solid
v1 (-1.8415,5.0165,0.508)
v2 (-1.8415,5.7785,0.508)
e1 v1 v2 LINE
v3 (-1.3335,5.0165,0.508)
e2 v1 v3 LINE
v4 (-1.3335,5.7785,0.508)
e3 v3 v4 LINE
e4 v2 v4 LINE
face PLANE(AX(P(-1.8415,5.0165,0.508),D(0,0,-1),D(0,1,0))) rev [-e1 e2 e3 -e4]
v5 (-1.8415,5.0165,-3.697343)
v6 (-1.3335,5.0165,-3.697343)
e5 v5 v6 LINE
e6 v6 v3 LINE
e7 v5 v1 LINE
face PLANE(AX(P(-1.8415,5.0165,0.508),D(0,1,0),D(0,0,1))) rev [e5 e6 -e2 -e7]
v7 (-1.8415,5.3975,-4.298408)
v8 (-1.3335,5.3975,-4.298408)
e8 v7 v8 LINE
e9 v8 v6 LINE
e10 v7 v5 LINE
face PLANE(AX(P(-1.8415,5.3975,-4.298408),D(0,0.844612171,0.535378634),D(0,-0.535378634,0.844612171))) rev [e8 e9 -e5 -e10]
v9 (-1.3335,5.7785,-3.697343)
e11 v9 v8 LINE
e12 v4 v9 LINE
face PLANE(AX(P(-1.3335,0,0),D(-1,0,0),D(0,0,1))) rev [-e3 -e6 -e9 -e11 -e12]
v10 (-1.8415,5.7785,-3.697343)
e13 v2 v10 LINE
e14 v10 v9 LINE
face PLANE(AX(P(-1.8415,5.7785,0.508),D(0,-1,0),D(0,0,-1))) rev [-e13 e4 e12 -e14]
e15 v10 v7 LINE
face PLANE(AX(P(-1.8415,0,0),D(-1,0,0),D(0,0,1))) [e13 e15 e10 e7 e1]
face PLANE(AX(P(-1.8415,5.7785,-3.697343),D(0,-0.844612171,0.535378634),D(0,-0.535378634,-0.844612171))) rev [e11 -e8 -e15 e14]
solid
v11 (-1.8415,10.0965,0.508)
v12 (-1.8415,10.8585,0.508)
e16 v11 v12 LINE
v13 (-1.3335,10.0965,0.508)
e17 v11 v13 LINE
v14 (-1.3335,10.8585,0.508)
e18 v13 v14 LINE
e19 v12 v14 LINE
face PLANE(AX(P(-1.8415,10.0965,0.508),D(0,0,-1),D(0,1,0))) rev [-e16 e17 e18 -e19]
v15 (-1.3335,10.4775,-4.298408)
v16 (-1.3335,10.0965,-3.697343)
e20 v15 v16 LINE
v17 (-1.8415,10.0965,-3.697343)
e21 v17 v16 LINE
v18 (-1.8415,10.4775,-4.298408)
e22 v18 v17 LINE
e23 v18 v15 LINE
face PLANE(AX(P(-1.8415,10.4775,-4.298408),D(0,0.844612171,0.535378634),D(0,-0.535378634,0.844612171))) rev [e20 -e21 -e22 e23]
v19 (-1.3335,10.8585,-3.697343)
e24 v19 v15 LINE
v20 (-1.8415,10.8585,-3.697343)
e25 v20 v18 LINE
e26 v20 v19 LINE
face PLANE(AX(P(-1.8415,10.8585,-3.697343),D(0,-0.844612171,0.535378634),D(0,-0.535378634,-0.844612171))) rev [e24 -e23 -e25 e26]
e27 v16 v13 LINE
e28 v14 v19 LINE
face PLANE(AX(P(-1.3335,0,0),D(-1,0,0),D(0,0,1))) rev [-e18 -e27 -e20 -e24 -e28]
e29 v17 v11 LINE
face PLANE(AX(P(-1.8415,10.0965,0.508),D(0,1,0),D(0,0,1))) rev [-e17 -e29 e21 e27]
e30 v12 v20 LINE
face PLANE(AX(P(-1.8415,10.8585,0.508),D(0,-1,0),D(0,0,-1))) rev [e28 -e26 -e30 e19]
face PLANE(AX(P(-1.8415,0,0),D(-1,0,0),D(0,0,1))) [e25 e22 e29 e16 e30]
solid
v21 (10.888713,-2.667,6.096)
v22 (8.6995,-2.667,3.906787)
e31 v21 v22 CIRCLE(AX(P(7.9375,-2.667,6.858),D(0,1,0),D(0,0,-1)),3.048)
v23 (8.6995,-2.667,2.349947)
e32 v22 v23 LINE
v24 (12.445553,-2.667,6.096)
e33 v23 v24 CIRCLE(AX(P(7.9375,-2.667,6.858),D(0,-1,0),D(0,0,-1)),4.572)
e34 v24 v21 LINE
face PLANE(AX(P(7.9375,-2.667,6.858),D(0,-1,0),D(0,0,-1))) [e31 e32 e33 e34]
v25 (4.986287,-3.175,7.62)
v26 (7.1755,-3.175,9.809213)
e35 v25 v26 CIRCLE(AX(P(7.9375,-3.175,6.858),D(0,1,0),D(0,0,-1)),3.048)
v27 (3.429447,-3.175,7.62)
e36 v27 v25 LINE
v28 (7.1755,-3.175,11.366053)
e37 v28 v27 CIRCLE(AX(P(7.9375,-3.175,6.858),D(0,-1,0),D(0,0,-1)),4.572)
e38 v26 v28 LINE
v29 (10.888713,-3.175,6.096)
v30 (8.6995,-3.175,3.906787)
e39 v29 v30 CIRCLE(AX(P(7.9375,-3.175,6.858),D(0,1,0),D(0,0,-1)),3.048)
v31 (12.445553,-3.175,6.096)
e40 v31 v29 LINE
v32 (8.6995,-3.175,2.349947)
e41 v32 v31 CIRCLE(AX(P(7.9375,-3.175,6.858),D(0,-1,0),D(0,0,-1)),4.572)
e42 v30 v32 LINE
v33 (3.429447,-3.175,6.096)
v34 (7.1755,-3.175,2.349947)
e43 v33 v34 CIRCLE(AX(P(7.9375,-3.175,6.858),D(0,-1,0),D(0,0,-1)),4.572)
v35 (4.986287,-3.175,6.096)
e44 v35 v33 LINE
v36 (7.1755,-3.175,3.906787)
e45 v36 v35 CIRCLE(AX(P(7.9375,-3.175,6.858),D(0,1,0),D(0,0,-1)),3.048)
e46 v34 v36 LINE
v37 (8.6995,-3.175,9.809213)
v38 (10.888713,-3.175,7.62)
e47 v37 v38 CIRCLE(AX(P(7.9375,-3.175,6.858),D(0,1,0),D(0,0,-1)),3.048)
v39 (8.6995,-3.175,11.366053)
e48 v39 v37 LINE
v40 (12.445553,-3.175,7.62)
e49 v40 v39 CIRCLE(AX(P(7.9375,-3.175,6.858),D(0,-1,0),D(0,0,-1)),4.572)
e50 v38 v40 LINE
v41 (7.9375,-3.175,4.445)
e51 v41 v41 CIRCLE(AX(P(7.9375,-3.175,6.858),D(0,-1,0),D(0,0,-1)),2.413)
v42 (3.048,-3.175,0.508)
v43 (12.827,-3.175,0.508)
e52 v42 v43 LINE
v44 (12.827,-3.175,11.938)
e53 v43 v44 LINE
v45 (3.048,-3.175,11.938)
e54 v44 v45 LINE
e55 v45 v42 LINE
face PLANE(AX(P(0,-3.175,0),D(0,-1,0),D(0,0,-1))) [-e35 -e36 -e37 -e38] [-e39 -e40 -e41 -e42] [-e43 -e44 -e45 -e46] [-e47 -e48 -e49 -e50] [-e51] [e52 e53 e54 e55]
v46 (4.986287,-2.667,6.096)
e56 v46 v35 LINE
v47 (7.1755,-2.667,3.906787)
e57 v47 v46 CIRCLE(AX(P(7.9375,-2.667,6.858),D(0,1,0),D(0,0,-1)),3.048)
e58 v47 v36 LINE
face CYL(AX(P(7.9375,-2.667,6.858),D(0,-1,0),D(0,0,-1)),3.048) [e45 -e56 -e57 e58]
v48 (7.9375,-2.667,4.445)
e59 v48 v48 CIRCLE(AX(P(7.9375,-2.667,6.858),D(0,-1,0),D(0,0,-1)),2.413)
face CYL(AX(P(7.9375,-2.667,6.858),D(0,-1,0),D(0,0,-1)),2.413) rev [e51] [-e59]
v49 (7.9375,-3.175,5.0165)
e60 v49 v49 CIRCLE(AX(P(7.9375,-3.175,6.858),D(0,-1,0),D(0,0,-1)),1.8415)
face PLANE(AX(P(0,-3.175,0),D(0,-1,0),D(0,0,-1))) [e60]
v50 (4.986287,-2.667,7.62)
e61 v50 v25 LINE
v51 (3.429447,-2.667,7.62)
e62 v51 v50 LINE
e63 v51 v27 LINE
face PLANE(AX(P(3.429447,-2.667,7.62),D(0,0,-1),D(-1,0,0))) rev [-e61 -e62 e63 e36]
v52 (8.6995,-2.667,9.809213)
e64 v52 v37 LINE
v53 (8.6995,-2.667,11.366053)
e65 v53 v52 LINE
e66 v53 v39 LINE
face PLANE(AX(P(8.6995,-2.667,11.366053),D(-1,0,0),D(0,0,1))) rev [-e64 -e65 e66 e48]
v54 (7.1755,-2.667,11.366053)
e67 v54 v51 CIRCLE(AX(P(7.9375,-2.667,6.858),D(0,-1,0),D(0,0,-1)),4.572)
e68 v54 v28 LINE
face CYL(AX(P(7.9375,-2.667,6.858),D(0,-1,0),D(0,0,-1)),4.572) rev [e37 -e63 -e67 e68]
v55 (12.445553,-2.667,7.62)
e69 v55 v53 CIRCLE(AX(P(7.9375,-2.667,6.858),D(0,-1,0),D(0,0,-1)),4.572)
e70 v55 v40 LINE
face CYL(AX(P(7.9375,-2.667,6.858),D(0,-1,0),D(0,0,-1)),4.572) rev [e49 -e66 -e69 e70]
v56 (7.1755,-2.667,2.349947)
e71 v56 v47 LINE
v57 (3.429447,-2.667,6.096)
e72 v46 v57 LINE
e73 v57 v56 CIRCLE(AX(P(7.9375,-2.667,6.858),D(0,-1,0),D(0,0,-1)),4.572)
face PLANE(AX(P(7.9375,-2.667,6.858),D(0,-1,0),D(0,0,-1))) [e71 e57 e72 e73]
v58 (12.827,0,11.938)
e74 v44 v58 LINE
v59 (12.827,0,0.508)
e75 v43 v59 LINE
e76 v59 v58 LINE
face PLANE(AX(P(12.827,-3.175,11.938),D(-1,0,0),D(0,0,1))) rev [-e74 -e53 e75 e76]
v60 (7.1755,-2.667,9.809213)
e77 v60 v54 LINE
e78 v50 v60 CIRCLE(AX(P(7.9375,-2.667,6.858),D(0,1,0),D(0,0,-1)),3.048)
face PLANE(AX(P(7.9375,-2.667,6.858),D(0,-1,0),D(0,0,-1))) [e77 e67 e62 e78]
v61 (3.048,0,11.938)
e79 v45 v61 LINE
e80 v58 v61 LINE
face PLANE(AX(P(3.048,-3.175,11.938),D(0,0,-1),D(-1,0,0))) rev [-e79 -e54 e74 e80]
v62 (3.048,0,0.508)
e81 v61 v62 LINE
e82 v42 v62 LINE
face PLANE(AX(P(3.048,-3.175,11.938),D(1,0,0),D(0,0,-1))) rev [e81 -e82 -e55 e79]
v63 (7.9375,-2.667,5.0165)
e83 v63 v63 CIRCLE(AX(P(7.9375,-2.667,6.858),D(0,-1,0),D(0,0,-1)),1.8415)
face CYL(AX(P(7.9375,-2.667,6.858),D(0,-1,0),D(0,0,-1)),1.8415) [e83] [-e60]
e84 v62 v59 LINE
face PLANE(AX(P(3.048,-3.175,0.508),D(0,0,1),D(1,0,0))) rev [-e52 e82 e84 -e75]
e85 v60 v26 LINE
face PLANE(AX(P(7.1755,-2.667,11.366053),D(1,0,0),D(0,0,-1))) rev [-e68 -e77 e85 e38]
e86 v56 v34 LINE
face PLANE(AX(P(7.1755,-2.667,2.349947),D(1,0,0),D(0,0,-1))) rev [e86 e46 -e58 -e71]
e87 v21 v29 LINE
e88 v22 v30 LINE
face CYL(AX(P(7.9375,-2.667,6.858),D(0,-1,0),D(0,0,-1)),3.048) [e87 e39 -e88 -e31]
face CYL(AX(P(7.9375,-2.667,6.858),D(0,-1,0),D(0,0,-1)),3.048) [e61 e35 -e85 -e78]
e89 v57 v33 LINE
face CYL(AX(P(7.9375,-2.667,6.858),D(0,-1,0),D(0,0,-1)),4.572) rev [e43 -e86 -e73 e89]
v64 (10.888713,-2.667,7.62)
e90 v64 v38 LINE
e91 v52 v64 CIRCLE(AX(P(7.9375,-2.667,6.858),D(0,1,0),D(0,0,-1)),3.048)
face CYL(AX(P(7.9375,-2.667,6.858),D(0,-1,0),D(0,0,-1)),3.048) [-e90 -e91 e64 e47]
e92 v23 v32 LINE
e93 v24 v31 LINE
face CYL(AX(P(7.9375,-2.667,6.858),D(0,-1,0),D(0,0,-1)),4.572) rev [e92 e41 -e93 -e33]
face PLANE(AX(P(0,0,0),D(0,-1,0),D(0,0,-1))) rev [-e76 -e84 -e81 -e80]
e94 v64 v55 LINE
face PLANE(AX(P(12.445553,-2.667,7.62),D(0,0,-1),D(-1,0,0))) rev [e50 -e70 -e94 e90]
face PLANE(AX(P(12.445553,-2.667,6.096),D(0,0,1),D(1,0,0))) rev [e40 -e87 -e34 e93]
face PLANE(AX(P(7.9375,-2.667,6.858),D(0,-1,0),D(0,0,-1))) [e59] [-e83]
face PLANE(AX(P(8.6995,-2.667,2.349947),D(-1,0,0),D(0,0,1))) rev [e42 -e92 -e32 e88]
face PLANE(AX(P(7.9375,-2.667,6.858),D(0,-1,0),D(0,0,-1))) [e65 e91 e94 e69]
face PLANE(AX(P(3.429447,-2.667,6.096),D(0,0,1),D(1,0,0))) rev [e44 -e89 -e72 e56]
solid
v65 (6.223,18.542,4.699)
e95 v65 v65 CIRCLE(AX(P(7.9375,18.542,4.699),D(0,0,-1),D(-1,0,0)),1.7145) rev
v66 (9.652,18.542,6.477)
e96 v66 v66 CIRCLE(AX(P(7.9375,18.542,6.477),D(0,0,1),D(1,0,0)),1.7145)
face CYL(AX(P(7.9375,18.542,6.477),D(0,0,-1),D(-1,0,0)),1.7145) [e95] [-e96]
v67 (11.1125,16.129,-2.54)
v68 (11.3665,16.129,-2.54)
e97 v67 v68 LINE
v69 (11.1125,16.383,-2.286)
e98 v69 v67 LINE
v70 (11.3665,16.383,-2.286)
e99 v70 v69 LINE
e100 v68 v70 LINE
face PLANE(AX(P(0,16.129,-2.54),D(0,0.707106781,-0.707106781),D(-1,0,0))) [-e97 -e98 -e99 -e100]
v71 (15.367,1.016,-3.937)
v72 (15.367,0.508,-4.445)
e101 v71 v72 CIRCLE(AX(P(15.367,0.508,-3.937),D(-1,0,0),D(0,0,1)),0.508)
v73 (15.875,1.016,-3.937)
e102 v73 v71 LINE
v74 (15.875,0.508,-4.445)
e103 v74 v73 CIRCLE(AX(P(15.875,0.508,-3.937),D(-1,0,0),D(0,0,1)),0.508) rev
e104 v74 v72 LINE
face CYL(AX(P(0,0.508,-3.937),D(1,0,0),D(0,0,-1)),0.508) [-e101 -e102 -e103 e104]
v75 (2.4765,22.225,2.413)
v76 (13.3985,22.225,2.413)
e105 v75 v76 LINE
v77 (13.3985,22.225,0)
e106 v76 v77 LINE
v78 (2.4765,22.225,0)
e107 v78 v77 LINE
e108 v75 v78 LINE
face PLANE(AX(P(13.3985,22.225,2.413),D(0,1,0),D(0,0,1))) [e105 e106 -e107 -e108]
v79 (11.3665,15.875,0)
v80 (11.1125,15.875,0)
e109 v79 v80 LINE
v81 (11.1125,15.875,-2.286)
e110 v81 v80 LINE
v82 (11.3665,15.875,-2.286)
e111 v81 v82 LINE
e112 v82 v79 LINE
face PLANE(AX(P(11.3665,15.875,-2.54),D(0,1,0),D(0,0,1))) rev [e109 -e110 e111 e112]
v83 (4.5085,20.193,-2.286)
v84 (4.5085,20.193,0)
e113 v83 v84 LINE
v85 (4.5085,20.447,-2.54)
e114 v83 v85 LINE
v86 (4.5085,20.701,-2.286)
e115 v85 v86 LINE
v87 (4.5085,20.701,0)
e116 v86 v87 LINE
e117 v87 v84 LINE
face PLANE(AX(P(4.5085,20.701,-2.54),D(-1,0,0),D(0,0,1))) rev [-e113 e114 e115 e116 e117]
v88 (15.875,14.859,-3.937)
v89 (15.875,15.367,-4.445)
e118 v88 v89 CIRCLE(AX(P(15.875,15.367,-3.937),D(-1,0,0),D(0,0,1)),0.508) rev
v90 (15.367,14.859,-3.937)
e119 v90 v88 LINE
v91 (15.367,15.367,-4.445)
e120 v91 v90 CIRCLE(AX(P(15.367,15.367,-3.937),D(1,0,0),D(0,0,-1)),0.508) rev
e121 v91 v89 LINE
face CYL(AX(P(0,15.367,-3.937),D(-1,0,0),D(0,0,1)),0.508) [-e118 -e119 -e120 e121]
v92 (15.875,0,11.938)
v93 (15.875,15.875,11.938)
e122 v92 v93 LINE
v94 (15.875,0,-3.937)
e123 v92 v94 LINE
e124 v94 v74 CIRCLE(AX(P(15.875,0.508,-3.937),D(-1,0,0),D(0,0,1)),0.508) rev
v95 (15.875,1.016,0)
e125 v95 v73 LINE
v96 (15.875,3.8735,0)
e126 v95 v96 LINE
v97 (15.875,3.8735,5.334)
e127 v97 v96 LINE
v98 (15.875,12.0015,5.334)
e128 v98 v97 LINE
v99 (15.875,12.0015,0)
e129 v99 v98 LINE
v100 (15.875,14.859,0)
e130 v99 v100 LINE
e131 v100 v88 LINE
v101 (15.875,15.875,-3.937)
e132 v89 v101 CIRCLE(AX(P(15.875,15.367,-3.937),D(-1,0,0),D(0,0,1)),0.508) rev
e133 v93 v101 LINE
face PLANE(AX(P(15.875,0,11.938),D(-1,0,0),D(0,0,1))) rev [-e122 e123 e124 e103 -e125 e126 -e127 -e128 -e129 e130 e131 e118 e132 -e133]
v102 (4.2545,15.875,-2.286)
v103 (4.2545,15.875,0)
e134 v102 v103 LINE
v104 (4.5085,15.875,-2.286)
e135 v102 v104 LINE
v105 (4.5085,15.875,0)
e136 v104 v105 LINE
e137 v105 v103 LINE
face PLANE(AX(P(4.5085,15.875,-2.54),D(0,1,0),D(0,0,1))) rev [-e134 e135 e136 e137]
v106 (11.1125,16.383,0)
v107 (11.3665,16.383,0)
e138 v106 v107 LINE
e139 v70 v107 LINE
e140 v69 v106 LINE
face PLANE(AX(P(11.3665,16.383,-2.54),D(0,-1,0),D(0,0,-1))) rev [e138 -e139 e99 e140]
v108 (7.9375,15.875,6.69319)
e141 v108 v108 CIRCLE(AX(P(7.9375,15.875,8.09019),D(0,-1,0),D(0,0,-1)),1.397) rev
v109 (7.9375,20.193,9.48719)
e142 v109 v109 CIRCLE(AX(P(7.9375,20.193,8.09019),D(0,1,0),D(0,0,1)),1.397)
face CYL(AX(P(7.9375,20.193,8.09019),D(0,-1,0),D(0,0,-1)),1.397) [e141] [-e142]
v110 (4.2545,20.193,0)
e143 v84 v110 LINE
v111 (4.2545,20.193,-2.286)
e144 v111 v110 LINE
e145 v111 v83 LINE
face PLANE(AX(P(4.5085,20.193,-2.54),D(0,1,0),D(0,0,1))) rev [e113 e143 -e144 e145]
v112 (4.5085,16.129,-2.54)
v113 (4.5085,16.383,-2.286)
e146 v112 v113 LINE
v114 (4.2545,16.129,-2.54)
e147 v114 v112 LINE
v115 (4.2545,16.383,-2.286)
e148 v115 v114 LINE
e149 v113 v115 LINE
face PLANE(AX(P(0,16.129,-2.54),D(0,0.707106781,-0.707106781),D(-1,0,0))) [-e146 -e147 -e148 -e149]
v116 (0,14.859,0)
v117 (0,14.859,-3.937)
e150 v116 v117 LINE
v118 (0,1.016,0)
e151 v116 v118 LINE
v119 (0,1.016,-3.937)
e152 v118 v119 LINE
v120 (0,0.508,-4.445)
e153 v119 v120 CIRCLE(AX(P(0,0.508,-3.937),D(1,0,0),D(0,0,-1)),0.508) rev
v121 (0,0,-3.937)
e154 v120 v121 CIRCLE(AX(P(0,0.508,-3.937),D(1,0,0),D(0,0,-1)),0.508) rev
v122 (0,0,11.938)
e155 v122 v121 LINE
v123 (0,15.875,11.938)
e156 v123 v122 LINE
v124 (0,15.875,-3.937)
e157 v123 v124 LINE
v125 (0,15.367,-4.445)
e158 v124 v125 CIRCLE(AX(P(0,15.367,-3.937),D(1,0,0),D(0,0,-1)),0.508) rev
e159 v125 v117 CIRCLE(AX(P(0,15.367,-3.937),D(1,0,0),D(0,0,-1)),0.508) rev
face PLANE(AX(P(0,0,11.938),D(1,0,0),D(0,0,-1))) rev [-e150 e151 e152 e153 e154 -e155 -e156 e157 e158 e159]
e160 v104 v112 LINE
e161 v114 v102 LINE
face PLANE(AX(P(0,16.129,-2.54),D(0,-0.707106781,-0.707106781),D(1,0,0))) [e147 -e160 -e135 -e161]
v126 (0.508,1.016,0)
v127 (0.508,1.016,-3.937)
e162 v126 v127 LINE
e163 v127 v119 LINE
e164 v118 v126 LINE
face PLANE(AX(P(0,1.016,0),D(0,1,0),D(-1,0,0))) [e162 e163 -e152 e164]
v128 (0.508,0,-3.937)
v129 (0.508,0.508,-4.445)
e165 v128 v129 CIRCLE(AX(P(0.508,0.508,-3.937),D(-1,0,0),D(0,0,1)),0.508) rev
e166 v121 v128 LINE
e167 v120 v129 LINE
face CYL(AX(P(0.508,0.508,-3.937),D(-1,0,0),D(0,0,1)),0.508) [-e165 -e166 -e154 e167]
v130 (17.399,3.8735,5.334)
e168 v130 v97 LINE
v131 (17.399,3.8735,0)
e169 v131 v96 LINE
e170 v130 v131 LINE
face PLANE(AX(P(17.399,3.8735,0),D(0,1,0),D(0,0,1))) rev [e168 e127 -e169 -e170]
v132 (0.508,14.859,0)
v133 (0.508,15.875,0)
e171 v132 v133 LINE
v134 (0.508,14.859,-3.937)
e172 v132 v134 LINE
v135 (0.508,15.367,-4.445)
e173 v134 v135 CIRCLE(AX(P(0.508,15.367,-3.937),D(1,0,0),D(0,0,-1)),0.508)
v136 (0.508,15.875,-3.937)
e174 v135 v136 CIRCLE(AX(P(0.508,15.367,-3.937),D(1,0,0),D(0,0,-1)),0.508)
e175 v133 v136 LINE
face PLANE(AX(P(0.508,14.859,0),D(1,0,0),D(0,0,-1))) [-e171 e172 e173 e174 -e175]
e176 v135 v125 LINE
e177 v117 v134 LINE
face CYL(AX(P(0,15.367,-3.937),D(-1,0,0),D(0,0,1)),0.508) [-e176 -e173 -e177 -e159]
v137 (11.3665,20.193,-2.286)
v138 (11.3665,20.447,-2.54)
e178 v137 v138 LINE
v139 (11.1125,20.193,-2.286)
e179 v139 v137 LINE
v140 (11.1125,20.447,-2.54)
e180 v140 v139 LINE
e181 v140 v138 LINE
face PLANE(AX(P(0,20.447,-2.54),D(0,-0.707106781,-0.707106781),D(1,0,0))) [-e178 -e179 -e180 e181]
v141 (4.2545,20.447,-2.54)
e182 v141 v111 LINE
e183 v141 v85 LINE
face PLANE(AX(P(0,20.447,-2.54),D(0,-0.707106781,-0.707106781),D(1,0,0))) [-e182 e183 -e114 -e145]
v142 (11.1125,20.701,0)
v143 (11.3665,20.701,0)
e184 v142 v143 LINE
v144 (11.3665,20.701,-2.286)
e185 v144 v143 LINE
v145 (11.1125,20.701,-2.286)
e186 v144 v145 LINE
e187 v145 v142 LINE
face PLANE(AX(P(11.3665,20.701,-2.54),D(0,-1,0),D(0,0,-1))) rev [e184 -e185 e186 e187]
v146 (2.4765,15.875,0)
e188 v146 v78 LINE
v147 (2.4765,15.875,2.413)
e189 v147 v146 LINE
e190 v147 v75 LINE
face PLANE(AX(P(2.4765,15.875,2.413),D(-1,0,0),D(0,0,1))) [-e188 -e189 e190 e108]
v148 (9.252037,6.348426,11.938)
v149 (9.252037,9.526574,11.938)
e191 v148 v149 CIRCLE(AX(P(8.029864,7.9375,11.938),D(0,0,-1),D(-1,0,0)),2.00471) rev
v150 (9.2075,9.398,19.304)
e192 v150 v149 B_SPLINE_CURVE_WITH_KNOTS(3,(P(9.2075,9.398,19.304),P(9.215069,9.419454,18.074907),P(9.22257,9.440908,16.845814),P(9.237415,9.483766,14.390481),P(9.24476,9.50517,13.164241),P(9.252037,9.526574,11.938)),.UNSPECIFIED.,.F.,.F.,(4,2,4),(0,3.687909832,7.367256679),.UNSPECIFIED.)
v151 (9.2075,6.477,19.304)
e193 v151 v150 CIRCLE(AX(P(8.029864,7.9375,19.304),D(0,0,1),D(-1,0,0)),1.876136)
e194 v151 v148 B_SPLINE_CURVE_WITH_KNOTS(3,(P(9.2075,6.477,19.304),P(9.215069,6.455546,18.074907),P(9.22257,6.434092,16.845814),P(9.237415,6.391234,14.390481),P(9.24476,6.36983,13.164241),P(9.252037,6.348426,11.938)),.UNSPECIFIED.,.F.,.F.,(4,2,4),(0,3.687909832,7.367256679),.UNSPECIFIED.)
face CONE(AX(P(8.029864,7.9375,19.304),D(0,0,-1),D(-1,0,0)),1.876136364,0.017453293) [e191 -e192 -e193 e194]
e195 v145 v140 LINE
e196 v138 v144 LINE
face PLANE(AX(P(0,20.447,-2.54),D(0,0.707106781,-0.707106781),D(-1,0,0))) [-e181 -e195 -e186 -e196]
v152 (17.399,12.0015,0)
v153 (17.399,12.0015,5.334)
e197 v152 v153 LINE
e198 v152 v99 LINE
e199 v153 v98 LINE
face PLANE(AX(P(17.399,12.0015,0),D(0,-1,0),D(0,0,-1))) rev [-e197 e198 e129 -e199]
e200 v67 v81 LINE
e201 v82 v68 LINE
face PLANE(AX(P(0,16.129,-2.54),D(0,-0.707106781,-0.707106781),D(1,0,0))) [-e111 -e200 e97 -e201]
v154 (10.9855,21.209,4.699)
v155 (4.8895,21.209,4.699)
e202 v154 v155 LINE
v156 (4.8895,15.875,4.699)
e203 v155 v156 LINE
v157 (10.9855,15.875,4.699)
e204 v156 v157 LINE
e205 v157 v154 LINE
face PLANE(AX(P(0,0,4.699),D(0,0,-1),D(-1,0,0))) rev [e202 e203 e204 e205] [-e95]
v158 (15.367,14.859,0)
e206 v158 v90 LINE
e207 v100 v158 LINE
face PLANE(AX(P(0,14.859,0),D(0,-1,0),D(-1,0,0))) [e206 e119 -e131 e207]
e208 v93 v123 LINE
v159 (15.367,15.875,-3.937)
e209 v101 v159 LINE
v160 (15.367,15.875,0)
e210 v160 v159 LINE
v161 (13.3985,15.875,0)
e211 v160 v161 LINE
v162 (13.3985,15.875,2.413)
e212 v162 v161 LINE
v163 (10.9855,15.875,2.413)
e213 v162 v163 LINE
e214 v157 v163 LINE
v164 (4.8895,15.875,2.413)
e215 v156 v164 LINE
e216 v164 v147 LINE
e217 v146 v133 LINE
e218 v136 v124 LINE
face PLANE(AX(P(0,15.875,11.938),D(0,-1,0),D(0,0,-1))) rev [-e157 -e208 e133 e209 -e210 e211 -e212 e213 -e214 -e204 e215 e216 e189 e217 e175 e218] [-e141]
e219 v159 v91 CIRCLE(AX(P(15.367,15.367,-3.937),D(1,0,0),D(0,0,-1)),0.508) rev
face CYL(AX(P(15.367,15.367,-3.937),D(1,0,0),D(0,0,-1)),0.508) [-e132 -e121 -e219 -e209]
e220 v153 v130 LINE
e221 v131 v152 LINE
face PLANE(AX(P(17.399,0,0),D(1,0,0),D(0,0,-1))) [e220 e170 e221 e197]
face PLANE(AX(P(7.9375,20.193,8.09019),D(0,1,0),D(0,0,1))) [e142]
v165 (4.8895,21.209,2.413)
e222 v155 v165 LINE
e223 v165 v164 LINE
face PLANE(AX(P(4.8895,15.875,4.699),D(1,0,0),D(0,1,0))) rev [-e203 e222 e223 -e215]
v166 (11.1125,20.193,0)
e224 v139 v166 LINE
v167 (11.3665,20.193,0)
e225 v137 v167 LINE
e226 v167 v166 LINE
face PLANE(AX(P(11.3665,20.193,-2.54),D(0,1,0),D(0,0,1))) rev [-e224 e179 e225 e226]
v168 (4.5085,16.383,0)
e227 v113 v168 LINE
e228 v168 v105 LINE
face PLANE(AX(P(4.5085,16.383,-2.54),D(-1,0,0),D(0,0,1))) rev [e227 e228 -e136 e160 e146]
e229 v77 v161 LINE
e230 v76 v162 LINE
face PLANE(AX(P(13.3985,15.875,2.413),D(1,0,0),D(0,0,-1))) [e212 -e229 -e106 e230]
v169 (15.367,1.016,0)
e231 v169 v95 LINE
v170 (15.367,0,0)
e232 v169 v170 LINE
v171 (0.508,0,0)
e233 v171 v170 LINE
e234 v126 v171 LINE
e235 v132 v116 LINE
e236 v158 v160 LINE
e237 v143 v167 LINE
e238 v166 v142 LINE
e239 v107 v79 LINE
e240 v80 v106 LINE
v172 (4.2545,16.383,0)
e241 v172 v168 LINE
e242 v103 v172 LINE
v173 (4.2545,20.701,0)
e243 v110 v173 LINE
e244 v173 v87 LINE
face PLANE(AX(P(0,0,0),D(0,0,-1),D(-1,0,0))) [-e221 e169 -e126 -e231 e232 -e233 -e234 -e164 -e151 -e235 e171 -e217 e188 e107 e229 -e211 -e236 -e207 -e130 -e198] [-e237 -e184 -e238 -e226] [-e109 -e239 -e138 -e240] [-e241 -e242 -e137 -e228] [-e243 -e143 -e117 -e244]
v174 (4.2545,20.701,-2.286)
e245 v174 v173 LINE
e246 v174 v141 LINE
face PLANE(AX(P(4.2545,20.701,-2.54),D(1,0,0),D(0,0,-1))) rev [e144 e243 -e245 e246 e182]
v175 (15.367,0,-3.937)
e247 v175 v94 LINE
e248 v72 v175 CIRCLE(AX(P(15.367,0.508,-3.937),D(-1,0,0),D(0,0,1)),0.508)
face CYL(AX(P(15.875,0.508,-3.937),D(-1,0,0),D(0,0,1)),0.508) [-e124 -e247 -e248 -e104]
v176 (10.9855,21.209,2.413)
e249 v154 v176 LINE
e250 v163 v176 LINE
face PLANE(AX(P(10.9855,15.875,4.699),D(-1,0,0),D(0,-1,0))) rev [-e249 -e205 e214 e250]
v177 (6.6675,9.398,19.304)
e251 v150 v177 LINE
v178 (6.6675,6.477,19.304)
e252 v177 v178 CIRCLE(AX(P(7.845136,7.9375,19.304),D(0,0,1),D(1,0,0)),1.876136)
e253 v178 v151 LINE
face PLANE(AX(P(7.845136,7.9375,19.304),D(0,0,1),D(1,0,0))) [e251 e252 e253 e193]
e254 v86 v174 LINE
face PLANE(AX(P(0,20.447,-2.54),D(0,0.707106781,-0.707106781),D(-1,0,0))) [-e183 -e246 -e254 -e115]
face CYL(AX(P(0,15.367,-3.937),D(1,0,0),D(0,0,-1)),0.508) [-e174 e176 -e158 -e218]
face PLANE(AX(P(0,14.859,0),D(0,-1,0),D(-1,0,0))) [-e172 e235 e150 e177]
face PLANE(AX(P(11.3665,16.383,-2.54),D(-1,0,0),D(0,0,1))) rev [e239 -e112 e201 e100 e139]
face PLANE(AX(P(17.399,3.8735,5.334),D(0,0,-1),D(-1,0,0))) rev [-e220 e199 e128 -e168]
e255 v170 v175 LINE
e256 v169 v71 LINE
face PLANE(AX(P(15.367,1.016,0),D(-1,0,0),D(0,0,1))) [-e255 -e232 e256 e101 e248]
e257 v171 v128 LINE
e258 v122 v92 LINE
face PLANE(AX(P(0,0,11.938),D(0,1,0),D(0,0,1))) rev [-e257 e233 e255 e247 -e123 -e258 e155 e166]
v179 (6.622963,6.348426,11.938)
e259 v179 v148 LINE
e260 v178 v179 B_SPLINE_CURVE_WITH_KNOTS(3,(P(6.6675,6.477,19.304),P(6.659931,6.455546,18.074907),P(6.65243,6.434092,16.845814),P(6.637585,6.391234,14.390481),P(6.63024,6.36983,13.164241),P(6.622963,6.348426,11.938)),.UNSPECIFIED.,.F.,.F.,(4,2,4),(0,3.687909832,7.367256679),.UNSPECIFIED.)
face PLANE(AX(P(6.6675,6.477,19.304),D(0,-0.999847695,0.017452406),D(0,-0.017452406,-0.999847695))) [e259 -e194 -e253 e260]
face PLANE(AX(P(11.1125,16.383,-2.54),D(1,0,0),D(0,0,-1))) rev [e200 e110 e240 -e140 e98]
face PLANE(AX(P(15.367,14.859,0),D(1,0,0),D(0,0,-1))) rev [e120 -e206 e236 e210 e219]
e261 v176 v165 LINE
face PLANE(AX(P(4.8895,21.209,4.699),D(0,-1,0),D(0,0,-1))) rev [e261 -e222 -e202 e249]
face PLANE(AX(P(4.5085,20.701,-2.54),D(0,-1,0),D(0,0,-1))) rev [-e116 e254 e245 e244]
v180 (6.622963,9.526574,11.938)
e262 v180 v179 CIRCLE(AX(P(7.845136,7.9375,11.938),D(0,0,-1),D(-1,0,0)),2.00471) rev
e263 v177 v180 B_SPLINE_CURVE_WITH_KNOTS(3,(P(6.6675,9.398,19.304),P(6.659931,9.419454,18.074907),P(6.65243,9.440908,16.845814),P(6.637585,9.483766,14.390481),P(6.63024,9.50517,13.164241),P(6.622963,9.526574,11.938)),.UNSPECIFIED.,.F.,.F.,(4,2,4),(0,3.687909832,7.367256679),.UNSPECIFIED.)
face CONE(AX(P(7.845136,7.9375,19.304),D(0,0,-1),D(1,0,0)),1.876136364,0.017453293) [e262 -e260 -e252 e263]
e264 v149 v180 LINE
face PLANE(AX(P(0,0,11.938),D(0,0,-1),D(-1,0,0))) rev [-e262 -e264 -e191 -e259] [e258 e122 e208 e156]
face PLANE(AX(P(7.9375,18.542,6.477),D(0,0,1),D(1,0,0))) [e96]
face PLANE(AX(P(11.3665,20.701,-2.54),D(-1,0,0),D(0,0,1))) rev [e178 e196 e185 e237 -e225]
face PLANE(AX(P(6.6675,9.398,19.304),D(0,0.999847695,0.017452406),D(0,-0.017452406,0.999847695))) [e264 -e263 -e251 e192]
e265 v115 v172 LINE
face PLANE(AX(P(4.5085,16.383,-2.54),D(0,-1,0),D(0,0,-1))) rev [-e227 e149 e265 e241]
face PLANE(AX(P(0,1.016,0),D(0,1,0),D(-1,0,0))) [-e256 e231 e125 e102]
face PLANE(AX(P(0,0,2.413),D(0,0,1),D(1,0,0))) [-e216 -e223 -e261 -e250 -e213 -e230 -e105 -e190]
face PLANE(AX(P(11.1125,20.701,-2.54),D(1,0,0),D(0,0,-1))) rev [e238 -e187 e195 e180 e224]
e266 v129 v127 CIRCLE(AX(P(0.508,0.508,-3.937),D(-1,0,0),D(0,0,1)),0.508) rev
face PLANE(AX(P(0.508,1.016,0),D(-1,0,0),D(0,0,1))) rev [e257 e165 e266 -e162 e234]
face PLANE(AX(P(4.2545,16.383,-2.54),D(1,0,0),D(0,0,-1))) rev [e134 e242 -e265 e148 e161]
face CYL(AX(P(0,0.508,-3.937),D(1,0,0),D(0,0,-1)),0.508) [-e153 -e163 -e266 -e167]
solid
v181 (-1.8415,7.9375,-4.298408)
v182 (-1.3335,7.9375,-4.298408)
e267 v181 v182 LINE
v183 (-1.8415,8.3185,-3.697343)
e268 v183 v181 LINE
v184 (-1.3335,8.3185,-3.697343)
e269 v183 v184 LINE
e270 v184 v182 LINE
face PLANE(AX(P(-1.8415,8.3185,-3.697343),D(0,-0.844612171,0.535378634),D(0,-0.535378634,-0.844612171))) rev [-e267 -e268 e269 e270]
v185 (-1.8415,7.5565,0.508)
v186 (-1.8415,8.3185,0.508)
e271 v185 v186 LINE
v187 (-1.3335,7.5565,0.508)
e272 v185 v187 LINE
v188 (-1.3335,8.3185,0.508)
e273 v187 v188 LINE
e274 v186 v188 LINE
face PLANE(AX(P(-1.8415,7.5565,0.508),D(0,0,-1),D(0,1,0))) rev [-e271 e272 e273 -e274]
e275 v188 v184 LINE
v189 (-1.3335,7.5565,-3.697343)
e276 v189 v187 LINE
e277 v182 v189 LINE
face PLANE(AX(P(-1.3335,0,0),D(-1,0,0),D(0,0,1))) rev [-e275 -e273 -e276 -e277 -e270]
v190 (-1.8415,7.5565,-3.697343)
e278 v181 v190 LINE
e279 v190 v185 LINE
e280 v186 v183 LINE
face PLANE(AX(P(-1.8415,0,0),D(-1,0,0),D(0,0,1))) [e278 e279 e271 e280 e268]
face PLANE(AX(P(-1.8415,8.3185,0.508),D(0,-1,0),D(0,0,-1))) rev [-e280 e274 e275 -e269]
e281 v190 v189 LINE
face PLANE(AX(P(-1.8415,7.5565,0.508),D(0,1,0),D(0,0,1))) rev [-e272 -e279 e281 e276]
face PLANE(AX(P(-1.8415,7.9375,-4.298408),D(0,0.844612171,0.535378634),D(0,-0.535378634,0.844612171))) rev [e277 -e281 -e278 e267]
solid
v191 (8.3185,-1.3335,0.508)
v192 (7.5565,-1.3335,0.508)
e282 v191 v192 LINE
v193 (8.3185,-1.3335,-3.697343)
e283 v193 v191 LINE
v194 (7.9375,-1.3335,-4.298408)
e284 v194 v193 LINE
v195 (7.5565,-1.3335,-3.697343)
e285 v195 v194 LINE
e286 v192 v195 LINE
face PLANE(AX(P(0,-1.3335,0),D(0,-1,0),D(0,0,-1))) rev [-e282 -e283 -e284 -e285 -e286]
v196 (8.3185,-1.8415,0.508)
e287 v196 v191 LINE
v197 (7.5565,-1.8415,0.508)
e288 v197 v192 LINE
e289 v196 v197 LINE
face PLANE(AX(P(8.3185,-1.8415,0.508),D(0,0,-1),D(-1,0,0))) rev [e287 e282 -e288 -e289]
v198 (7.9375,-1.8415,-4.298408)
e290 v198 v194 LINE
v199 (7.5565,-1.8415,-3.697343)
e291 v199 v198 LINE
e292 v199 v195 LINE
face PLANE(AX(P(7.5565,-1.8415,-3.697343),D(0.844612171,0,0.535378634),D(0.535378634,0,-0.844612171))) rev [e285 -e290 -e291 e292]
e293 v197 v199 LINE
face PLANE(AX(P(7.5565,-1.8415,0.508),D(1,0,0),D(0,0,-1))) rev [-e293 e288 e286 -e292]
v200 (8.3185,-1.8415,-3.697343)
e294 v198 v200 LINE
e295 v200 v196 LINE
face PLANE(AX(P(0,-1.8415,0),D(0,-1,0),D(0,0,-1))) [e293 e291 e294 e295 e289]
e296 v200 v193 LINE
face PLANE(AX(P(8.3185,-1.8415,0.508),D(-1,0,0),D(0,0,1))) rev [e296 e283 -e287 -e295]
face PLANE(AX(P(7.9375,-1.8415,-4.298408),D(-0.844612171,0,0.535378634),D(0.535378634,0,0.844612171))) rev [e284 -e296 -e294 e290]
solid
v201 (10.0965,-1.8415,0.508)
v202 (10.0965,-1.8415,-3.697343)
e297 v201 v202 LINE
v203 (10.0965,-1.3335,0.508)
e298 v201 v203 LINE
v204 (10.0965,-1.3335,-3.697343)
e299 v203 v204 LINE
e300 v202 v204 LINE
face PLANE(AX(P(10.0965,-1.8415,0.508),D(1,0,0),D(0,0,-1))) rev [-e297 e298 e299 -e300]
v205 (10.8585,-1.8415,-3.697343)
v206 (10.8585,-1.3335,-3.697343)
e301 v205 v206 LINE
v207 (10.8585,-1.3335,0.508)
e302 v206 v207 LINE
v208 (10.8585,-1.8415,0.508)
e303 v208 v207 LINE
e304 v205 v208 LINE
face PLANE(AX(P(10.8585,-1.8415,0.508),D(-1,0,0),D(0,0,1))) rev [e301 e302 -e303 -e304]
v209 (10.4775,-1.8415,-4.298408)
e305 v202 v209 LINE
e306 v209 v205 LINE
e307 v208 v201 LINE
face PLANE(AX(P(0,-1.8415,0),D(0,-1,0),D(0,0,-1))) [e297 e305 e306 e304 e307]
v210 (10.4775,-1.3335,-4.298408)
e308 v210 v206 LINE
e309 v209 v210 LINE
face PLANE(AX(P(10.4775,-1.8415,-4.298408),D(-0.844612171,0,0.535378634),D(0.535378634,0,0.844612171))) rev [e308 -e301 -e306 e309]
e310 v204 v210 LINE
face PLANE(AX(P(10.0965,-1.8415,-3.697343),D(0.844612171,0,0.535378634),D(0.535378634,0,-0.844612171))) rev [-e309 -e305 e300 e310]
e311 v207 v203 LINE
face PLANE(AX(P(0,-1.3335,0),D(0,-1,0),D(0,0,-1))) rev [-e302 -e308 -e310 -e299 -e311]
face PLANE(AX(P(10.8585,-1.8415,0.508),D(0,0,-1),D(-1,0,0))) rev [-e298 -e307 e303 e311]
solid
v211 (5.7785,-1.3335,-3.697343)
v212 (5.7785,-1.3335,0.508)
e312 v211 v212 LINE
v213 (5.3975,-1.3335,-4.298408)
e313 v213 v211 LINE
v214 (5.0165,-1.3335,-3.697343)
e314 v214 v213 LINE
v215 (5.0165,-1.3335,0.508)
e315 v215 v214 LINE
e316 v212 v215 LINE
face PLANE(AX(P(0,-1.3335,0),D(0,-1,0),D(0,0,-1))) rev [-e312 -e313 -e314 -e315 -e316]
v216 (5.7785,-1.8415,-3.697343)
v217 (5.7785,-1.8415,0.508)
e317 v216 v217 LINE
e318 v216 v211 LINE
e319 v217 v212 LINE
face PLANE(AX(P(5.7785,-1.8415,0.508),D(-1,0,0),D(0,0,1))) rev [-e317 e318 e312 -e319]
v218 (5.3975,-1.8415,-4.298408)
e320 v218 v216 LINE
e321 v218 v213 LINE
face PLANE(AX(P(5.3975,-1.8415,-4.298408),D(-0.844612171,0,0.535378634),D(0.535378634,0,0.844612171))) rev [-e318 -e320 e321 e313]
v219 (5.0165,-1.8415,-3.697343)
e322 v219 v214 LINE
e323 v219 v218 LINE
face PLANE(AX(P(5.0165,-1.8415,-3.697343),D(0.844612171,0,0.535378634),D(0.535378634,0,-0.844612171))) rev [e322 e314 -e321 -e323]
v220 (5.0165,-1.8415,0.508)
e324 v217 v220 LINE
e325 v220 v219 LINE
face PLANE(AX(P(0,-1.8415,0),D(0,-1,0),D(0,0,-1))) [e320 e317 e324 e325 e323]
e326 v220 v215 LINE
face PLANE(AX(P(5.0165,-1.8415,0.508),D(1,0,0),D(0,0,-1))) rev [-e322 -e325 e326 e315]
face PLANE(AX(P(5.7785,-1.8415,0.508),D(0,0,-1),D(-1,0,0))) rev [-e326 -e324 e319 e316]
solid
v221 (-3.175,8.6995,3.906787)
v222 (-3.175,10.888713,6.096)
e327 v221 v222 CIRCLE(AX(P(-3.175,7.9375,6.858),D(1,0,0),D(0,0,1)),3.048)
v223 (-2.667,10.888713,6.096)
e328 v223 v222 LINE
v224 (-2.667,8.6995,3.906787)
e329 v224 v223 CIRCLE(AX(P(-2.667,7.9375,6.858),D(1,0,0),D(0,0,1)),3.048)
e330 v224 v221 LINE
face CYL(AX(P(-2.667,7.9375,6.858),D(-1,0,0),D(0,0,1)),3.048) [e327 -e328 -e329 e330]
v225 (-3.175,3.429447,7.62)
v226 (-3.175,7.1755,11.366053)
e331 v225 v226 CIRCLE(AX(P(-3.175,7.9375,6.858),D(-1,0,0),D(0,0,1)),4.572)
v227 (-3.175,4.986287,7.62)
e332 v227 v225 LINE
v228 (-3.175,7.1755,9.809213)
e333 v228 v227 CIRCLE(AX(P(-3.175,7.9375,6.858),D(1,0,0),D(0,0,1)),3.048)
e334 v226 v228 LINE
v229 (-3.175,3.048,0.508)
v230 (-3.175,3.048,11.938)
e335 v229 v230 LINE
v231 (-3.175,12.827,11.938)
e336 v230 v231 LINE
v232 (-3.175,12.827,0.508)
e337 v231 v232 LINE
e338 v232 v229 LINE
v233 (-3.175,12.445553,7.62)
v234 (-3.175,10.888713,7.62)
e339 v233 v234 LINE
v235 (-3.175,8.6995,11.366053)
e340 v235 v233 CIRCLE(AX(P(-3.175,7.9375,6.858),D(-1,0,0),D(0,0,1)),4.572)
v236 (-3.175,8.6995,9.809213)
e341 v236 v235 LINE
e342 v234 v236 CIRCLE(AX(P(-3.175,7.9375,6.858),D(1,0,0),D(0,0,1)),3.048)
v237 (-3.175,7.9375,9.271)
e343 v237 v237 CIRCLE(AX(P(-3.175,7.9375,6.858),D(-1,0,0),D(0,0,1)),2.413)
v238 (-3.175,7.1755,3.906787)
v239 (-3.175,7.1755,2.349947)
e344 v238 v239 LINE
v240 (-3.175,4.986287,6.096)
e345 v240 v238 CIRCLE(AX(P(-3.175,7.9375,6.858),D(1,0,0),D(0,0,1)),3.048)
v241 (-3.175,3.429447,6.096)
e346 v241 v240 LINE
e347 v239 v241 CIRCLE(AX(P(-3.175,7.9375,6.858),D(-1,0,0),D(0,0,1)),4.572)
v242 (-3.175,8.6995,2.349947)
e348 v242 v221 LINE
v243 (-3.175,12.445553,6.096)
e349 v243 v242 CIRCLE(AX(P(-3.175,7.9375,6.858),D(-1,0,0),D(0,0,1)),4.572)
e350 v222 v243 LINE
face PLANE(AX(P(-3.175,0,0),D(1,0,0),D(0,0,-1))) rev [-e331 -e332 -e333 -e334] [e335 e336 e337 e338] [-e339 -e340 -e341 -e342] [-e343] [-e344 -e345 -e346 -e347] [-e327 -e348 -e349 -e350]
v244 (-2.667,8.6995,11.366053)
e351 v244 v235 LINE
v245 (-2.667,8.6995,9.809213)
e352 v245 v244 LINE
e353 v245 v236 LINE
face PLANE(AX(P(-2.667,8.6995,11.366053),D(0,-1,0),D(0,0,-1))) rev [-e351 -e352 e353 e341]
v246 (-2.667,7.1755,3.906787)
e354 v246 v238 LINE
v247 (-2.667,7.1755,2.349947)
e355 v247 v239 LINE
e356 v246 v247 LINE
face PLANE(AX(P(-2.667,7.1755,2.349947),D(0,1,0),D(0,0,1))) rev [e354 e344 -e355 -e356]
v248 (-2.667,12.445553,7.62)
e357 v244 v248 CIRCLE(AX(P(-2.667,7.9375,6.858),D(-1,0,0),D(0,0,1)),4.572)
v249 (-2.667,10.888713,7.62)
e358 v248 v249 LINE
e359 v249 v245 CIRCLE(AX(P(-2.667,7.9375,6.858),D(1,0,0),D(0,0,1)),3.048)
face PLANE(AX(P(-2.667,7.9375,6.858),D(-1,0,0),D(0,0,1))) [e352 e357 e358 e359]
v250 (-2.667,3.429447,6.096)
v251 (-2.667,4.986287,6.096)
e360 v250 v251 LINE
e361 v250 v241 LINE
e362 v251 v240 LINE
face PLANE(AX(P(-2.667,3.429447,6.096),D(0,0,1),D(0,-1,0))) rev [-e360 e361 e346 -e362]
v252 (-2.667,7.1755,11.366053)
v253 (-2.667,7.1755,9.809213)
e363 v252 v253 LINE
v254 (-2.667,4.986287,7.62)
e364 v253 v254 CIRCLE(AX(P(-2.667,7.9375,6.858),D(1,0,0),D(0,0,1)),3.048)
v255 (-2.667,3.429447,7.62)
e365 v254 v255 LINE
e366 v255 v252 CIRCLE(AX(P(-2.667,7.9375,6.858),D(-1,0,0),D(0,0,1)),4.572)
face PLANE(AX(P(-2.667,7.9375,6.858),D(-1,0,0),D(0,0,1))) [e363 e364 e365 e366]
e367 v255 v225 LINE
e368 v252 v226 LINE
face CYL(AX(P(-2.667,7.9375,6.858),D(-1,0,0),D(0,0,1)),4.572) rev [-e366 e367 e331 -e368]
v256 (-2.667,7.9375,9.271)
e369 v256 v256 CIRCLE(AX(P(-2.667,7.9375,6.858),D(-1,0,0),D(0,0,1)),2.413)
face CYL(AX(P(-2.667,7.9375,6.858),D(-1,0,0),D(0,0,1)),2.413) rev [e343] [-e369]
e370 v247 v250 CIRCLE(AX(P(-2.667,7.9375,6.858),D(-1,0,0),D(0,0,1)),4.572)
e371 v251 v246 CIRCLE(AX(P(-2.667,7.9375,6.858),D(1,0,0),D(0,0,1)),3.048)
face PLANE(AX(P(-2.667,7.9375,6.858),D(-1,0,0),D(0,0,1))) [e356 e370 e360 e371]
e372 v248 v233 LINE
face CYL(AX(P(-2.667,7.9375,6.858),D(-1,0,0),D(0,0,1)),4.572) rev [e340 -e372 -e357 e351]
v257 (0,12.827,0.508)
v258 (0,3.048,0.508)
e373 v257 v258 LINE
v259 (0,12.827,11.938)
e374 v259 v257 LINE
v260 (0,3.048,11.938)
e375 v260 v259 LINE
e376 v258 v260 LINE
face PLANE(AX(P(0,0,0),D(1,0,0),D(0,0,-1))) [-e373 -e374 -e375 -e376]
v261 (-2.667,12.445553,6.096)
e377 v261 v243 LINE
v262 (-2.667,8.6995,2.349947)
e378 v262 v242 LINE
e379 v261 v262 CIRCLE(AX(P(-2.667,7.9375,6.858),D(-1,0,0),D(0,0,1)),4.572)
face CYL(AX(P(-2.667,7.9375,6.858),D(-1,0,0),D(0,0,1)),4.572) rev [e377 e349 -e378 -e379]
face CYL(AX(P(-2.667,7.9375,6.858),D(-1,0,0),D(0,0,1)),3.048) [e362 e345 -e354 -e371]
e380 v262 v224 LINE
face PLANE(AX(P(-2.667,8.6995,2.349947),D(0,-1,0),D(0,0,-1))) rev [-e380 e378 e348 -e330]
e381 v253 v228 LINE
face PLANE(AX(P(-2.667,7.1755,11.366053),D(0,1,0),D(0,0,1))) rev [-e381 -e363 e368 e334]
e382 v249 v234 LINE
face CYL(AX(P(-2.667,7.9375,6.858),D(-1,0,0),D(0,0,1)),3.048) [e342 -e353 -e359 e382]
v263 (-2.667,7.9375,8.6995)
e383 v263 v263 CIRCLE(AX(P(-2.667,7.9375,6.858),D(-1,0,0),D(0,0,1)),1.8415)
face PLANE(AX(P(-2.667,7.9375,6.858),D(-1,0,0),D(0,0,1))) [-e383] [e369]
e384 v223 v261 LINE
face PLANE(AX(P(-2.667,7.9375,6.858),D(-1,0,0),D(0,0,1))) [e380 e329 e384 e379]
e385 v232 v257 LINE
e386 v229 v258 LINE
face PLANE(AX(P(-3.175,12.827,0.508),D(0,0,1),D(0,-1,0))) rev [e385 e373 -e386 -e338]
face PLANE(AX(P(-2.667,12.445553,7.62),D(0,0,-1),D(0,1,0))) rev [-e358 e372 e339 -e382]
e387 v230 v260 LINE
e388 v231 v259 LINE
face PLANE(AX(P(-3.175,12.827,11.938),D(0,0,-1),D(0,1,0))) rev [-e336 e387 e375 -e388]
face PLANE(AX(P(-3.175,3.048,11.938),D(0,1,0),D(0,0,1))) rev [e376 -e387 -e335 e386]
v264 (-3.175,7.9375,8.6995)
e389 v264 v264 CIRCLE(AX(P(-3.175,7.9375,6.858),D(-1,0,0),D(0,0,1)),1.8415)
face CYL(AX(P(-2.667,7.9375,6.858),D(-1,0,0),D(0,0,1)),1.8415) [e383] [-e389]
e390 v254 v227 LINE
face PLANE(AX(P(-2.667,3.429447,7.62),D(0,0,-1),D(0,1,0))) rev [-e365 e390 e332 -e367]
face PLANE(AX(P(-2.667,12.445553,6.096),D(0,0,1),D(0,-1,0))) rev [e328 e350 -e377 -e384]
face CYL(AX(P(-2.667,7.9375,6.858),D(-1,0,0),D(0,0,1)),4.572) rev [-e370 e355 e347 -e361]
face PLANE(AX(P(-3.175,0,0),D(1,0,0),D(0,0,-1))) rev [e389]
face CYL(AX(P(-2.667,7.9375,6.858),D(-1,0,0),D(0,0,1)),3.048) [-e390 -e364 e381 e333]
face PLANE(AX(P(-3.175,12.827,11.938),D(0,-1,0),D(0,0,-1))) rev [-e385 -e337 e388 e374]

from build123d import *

# Parameters (mm, degrees)
SKETCH1_W              = 15.875
SKETCH1_H              = 15.875
BOSS_EXTRUDE1_DEPTH    = 11.938
SKETCH2_W              = 10.922
SKETCH2_H              = 6.35
BOSS_EXTRUDE2_DEPTH    = 2.413
SKETCH3_W              = 5.334
SKETCH3_H              = 8.128
BOSS_EXTRUDE3_DEPTH    = 1.524
SKETCH4_W              = 6.096
SKETCH4_H              = 5.334
BOSS_EXTRUDE4_DEPTH    = 2.286
SKETCH5_R              = 1.7145
BOSS_EXTRUDE5_DEPTH    = 1.778
SKETCH6_R              = 1.397
BOSS_EXTRUDE6_DEPTH    = 4.318
SKETCH7_W              = 9.779
SKETCH7_H              = 11.43
BOSS_EXTRUDE7_DEPTH    = 3.175
SKETCH8_W              = 11.43
SKETCH8_H              = 9.779
BOSS_EXTRUDE8_DEPTH    = 3.175
SKETCH9_R              = 2.413
SKETCH9_R_2            = 1.8415
CUT_EXTRUDE1_DEPTH     = 0.508
SKETCH10_R             = 2.413
SKETCH10_R_2           = 1.8415
CUT_EXTRUDE2_DEPTH     = 0.508
SKETCH12_W             = 0.508
SKETCH12_H             = 4.445
EXTRUDE_THIN1_DEPTH    = 1.016
SKETCH13_W             = 0.508
SKETCH13_H             = 4.445
EXTRUDE_THIN2_DEPTH    = 1.016
FILLET1_R              = 0.508
BOSS_EXTRUDE9_DEPTH    = 0.254
BOSS_EXTRUDE9_2_DEPTH  = 0.254
BOSS_EXTRUDE9_3_DEPTH  = 0.254
BOSS_EXTRUDE10_DEPTH   = 0.254
BOSS_EXTRUDE10_2_DEPTH = 0.254
BOSS_EXTRUDE10_3_DEPTH = 0.254
SKETCH16_W             = 0.254
SKETCH16_H             = 0.508
BOSS_EXTRUDE11_DEPTH   = 2.54
CHAMFER1_SIZE          = 0.254
BOSS_EXTRUDE12_DEPTH   = 7.366
DRAFT1_ANGLE           = 1


with BuildPart() as part:
    # Sketch1 → Boss-Extrude1 (new body)
    with BuildSketch(Plane.XY):
        with Locations((7.9375, 7.9375)):
            Rectangle(SKETCH1_W, SKETCH1_H)
    extrude(amount=BOSS_EXTRUDE1_DEPTH)

    # Sketch2 → Boss-Extrude2 (add)
    with BuildSketch(Plane(origin=(0, 0, 0), x_dir=(-1, 0, 0), z_dir=(0, 0, -1))):
        with Locations((-7.9375, 19.05)):
            Rectangle(SKETCH2_W, SKETCH2_H)
    extrude(amount=-BOSS_EXTRUDE2_DEPTH)

    # Sketch3 → Boss-Extrude3 (add)
    with BuildSketch(Plane(origin=(15.875, 0, 0), x_dir=(0, 0, -1), z_dir=(1, 0, 0))):
        with Locations((-2.667, 7.9375)):
            Rectangle(SKETCH3_W, SKETCH3_H)
    extrude(amount=BOSS_EXTRUDE3_DEPTH)

    # Sketch4 → Boss-Extrude4 (add)
    with BuildSketch(Plane.XY.offset(2.413)):
        with Locations((7.9375, 18.542)):
            Rectangle(SKETCH4_W, SKETCH4_H)
    extrude(amount=BOSS_EXTRUDE4_DEPTH)

    # Sketch5 → Boss-Extrude5 (add)
    with BuildSketch(Plane.XY.offset(4.699)):
        with Locations(Location((7.9375, 18.542, 0), (0, 0, 180))):
            Circle(SKETCH5_R)
    extrude(amount=BOSS_EXTRUDE5_DEPTH)

    # Sketch6 → Boss-Extrude6 (add)
    with BuildSketch(Plane(origin=(0, 15.875, 0), x_dir=(1, 0, 0), z_dir=(0, 1, 0))):
        with Locations(Location((7.9375, -8.090189982, 0), (0, 0, 90))):
            Circle(SKETCH6_R)
    extrude(amount=BOSS_EXTRUDE6_DEPTH)

    # Sketch12 → Extrude-Thin1 (add)
    with BuildSketch(Plane.XZ):
        with Locations((0.254, -2.2225)):
            Rectangle(SKETCH12_W, SKETCH12_H)
        with Locations((15.621, -2.2225)):
            Rectangle(SKETCH12_W, SKETCH12_H)
    extrude(amount=-EXTRUDE_THIN1_DEPTH)

    # Sketch13 → Extrude-Thin2 (add)
    with BuildSketch(Plane(origin=(0, 15.875, 0), x_dir=(1, 0, 0), z_dir=(0, 1, 0))):
        with Locations((0.254, 2.2225)):
            Rectangle(SKETCH13_W, SKETCH13_H)
        with Locations((15.621, 2.2225)):
            Rectangle(SKETCH13_W, SKETCH13_H)
    extrude(amount=-EXTRUDE_THIN2_DEPTH)

    # Fillet1
    fillet1_edges = [part.edges().sort_by_distance(p)[0] for p in [
        (0.254, 1.016, -4.445),
        (0.254, 15.875, -4.445),
        (0.254, 14.859, -4.445),
        (15.621, 15.875, -4.445),
        (15.621, 14.859, -4.445),
        (15.621, 1.016, -4.445),
        (15.621, 0, -4.445),
        (0.254, 0, -4.445),
    ]]
    fillet(fillet1_edges, radius=FILLET1_R - 0.0001)  # a hair under: the kernel refuses the full size

    # Sketch16 → Boss-Extrude11 (add)
    with BuildSketch(Plane(origin=(0, 0, 0), x_dir=(-1, 0, 0), z_dir=(0, 0, -1))):
        with Locations((-11.2395, 20.447)):
            Rectangle(SKETCH16_W, SKETCH16_H)
        with Locations((-4.3815, 20.447)):
            Rectangle(SKETCH16_W, SKETCH16_H)
        with Locations((-4.3815, 16.129)):
            Rectangle(SKETCH16_W, SKETCH16_H)
        with Locations((-11.2395, 16.129)):
            Rectangle(SKETCH16_W, SKETCH16_H)
    extrude(amount=BOSS_EXTRUDE11_DEPTH)

    # Chamfer1
    chamfer1_edges = [part.edges().sort_by_distance(p)[0] for p in [
        (11.2395, 15.875, -2.54),
        (11.2395, 16.383, -2.54),
        (4.3815, 15.875, -2.54),
        (4.3815, 16.383, -2.54),
        (4.3815, 20.193, -2.54),
        (4.3815, 20.701, -2.54),
        (11.2395, 20.193, -2.54),
        (11.2395, 20.701, -2.54),
    ]]
    chamfer(chamfer1_edges, length=CHAMFER1_SIZE - 0.0001)  # a hair under: the kernel refuses the full size

    # Sketch17 → Boss-Extrude12 (add)
    with BuildSketch(Plane.XY.offset(11.938)):
        with BuildLine():
            Line((6.6675, 9.398), (9.2075, 9.398))
            ThreePointArc((9.2075, 9.398), (9.906, 7.9375), (9.2075, 6.477))
            Line((9.2075, 6.477), (6.6675, 6.477))
            ThreePointArc((6.6675, 6.477), (5.969, 7.9375), (6.6675, 9.398))
        make_face()
    extrude(amount=BOSS_EXTRUDE12_DEPTH)

    # Draft1
    draft1_faces = [part.faces().sort_by_distance(p)[0] for p in [
        (9.906, 7.9375, 15.621),
        (7.9375, 9.398, 15.621),
        (5.969, 7.9375, 15.621),
        (7.9375, 6.477, 15.621),
    ]]
    draft(draft1_faces, Plane(origin=(7.845136364, 7.9375, 19.304), x_dir=(1, 0, 0), z_dir=(0, 0, 1)), DRAFT1_ANGLE)


with BuildPart() as body_2:
    # Sketch7 → Boss-Extrude7 (new body)
    with BuildSketch(Plane.XZ):
        with Locations((7.9375, 6.223)):
            Rectangle(SKETCH7_W, SKETCH7_H)
    extrude(amount=BOSS_EXTRUDE7_DEPTH)

    # Sketch10 → Cut-Extrude2 (cut)
    # profile 1 of 5: a face of its own
    with BuildSketch(Plane.XZ.offset(3.175)):
        with Locations(Location((7.9375, 6.858, 0), (0, 0, 270))):
            Circle(SKETCH10_R)
        with Locations(Location((7.9375, 6.858, 0), (0, 0, 270))):
            Circle(SKETCH10_R_2, mode=Mode.SUBTRACT)
    # profile 2 of 5: a face of its own
    with BuildSketch(Plane.XZ.offset(3.175)):
        with BuildLine():
            Line((3.429447205, 7.62), (4.98628669, 7.62))
            ThreePointArc((4.98628669, 7.62), (5.782238531, 9.013261469), (7.1755, 9.80921331))
            Line((7.1755, 9.80921331), (7.1755, 11.366052795))
            ThreePointArc((7.1755, 11.366052795), (4.704607796, 10.090892204), (3.429447205, 7.62))
        make_face()
    # profile 3 of 5: a face of its own
    with BuildSketch(Plane.XZ.offset(3.175)):
        with BuildLine():
            Line((3.429447205, 6.096), (4.98628669, 6.096))
            ThreePointArc((4.98628669, 6.096), (5.782238531, 4.702738531), (7.1755, 3.90678669))
            Line((7.1755, 3.90678669), (7.1755, 2.349947205))
            ThreePointArc((7.1755, 2.349947205), (4.704607796, 3.625107796), (3.429447205, 6.096))
        make_face()
    # profile 4 of 5: a face of its own
    with BuildSketch(Plane.XZ.offset(3.175)):
        with BuildLine():
            Line((8.6995, 11.366052795), (8.6995, 9.80921331))
            ThreePointArc((8.6995, 9.80921331), (10.092761469, 9.013261469), (10.88871331, 7.62))
            Line((10.88871331, 7.62), (12.445552795, 7.62))
            ThreePointArc((12.445552795, 7.62), (11.170392204, 10.090892204), (8.6995, 11.366052795))
        make_face()
    # profile 5 of 5: a face of its own
    with BuildSketch(Plane.XZ.offset(3.175)):
        with BuildLine():
            Line((12.445552795, 6.096), (10.88871331, 6.096))
            ThreePointArc((10.88871331, 6.096), (10.092761469, 4.702738531), (8.6995, 3.90678669))
            Line((8.6995, 3.90678669), (8.6995, 2.349947205))
            ThreePointArc((8.6995, 2.349947205), (11.170392204, 3.625107796), (12.445552795, 6.096))
        make_face()
    extrude(amount=-CUT_EXTRUDE2_DEPTH, mode=Mode.SUBTRACT)


with BuildPart() as body_3:
    # Sketch8 → Boss-Extrude8 (new body)
    with BuildSketch(Plane.ZY):
        with Locations((6.223, 7.9375)):
            Rectangle(SKETCH8_W, SKETCH8_H)
    extrude(amount=BOSS_EXTRUDE8_DEPTH)

    # Sketch9 → Cut-Extrude1 (cut)
    # profile 1 of 5: a face of its own
    with BuildSketch(Plane.ZY.offset(3.175)):
        with Locations((6.858, 7.9375)):
            Circle(SKETCH9_R)
        with Locations((6.858, 7.9375)):
            Circle(SKETCH9_R_2, mode=Mode.SUBTRACT)
    # profile 2 of 5: a face of its own
    with BuildSketch(Plane.ZY.offset(3.175)):
        with BuildLine():
            Line((7.62, 12.445552795), (7.62, 10.88871331))
            ThreePointArc((7.62, 10.88871331), (9.013261469, 10.092761469), (9.80921331, 8.6995))
            Line((9.80921331, 8.6995), (11.366052795, 8.6995))
            ThreePointArc((11.366052795, 8.6995), (10.090892204, 11.170392204), (7.62, 12.445552795))
        make_face()
    # profile 3 of 5: a face of its own
    with BuildSketch(Plane.ZY.offset(3.175)):
        with BuildLine():
            Line((6.096, 12.445552795), (6.096, 10.88871331))
            ThreePointArc((6.096, 10.88871331), (4.702738531, 10.092761469), (3.90678669, 8.6995))
            Line((3.90678669, 8.6995), (2.349947205, 8.6995))
            ThreePointArc((2.349947205, 8.6995), (3.625107796, 11.170392204), (6.096, 12.445552795))
        make_face()
    # profile 4 of 5: a face of its own
    with BuildSketch(Plane.ZY.offset(3.175)):
        with BuildLine():
            Line((11.366052795, 7.1755), (9.80921331, 7.1755))
            ThreePointArc((9.80921331, 7.1755), (9.013261469, 5.782238531), (7.62, 4.98628669))
            Line((7.62, 4.98628669), (7.62, 3.429447205))
            ThreePointArc((7.62, 3.429447205), (10.090892204, 4.704607796), (11.366052795, 7.1755))
        make_face()
    # profile 5 of 5: a face of its own
    with BuildSketch(Plane.ZY.offset(3.175)):
        with BuildLine():
            Line((6.096, 3.429447205), (6.096, 4.98628669))
            ThreePointArc((6.096, 4.98628669), (4.702738531, 5.782238531), (3.90678669, 7.1755))
            Line((3.90678669, 7.1755), (2.349947205, 7.1755))
            ThreePointArc((2.349947205, 7.1755), (3.625107796, 4.704607796), (6.096, 3.429447205))
        make_face()
    extrude(amount=-CUT_EXTRUDE1_DEPTH, mode=Mode.SUBTRACT)


with BuildPart() as body_4:
    # Sketch14 → Boss-Extrude9 (new, symmetric)
    with BuildSketch(Plane(origin=(0, -1.5875, 0), x_dir=(-1, 0, 0), z_dir=(0, -1, 0))):
        Polygon((-10.0965, -0.508), (-10.0965, 3.697342898), (-10.4775, 4.298407671), (-10.8585, 3.697342898), (-10.8585, -0.508), align=None)
    extrude(amount=BOSS_EXTRUDE9_DEPTH, both=True)


with BuildPart() as body_5:
    # Sketch14 → Boss-Extrude9 2 (new, symmetric)
    with BuildSketch(Plane(origin=(0, -1.5875, 0), x_dir=(-1, 0, 0), z_dir=(0, -1, 0))):
        Polygon((-7.5565, -0.508), (-7.5565, 3.697342898), (-7.9375, 4.298407671), (-8.3185, 3.697342898), (-8.3185, -0.508), align=None)
    extrude(amount=BOSS_EXTRUDE9_2_DEPTH, both=True)


with BuildPart() as body_6:
    # Sketch14 → Boss-Extrude9 3 (new, symmetric)
    with BuildSketch(Plane(origin=(0, -1.5875, 0), x_dir=(-1, 0, 0), z_dir=(0, -1, 0))):
        Polygon((-5.0165, -0.508), (-5.0165, 3.697342898), (-5.3975, 4.298407671), (-5.7785, 3.697342898), (-5.7785, -0.508), align=None)
    extrude(amount=BOSS_EXTRUDE9_3_DEPTH, both=True)


with BuildPart() as body_7:
    # Sketch15 → Boss-Extrude10 (new, symmetric)
    with BuildSketch(Plane.ZY.offset(1.5875)):
        Polygon((0.508, 8.3185), (-3.697342898, 8.3185), (-4.298407671, 7.9375), (-3.697342898, 7.5565), (0.508, 7.5565), align=None)
    extrude(amount=BOSS_EXTRUDE10_DEPTH, both=True)


with BuildPart() as body_8:
    # Sketch15 → Boss-Extrude10 2 (new, symmetric)
    with BuildSketch(Plane.ZY.offset(1.5875)):
        Polygon((0.508, 5.7785), (-3.697342898, 5.7785), (-4.298407671, 5.3975), (-3.697342898, 5.0165), (0.508, 5.0165), align=None)
    extrude(amount=BOSS_EXTRUDE10_2_DEPTH, both=True)


with BuildPart() as body_9:
    # Sketch15 → Boss-Extrude10 3 (new, symmetric)
    with BuildSketch(Plane.ZY.offset(1.5875)):
        Polygon((0.508, 10.8585), (-3.697342898, 10.8585), (-4.298407671, 10.4775), (-3.697342898, 10.0965), (0.508, 10.0965), align=None)
    extrude(amount=BOSS_EXTRUDE10_3_DEPTH, both=True)


solid = Compound([part.part, body_2.part, body_3.part, body_4.part, body_5.part, body_6.part, body_7.part, body_8.part, body_9.part])
